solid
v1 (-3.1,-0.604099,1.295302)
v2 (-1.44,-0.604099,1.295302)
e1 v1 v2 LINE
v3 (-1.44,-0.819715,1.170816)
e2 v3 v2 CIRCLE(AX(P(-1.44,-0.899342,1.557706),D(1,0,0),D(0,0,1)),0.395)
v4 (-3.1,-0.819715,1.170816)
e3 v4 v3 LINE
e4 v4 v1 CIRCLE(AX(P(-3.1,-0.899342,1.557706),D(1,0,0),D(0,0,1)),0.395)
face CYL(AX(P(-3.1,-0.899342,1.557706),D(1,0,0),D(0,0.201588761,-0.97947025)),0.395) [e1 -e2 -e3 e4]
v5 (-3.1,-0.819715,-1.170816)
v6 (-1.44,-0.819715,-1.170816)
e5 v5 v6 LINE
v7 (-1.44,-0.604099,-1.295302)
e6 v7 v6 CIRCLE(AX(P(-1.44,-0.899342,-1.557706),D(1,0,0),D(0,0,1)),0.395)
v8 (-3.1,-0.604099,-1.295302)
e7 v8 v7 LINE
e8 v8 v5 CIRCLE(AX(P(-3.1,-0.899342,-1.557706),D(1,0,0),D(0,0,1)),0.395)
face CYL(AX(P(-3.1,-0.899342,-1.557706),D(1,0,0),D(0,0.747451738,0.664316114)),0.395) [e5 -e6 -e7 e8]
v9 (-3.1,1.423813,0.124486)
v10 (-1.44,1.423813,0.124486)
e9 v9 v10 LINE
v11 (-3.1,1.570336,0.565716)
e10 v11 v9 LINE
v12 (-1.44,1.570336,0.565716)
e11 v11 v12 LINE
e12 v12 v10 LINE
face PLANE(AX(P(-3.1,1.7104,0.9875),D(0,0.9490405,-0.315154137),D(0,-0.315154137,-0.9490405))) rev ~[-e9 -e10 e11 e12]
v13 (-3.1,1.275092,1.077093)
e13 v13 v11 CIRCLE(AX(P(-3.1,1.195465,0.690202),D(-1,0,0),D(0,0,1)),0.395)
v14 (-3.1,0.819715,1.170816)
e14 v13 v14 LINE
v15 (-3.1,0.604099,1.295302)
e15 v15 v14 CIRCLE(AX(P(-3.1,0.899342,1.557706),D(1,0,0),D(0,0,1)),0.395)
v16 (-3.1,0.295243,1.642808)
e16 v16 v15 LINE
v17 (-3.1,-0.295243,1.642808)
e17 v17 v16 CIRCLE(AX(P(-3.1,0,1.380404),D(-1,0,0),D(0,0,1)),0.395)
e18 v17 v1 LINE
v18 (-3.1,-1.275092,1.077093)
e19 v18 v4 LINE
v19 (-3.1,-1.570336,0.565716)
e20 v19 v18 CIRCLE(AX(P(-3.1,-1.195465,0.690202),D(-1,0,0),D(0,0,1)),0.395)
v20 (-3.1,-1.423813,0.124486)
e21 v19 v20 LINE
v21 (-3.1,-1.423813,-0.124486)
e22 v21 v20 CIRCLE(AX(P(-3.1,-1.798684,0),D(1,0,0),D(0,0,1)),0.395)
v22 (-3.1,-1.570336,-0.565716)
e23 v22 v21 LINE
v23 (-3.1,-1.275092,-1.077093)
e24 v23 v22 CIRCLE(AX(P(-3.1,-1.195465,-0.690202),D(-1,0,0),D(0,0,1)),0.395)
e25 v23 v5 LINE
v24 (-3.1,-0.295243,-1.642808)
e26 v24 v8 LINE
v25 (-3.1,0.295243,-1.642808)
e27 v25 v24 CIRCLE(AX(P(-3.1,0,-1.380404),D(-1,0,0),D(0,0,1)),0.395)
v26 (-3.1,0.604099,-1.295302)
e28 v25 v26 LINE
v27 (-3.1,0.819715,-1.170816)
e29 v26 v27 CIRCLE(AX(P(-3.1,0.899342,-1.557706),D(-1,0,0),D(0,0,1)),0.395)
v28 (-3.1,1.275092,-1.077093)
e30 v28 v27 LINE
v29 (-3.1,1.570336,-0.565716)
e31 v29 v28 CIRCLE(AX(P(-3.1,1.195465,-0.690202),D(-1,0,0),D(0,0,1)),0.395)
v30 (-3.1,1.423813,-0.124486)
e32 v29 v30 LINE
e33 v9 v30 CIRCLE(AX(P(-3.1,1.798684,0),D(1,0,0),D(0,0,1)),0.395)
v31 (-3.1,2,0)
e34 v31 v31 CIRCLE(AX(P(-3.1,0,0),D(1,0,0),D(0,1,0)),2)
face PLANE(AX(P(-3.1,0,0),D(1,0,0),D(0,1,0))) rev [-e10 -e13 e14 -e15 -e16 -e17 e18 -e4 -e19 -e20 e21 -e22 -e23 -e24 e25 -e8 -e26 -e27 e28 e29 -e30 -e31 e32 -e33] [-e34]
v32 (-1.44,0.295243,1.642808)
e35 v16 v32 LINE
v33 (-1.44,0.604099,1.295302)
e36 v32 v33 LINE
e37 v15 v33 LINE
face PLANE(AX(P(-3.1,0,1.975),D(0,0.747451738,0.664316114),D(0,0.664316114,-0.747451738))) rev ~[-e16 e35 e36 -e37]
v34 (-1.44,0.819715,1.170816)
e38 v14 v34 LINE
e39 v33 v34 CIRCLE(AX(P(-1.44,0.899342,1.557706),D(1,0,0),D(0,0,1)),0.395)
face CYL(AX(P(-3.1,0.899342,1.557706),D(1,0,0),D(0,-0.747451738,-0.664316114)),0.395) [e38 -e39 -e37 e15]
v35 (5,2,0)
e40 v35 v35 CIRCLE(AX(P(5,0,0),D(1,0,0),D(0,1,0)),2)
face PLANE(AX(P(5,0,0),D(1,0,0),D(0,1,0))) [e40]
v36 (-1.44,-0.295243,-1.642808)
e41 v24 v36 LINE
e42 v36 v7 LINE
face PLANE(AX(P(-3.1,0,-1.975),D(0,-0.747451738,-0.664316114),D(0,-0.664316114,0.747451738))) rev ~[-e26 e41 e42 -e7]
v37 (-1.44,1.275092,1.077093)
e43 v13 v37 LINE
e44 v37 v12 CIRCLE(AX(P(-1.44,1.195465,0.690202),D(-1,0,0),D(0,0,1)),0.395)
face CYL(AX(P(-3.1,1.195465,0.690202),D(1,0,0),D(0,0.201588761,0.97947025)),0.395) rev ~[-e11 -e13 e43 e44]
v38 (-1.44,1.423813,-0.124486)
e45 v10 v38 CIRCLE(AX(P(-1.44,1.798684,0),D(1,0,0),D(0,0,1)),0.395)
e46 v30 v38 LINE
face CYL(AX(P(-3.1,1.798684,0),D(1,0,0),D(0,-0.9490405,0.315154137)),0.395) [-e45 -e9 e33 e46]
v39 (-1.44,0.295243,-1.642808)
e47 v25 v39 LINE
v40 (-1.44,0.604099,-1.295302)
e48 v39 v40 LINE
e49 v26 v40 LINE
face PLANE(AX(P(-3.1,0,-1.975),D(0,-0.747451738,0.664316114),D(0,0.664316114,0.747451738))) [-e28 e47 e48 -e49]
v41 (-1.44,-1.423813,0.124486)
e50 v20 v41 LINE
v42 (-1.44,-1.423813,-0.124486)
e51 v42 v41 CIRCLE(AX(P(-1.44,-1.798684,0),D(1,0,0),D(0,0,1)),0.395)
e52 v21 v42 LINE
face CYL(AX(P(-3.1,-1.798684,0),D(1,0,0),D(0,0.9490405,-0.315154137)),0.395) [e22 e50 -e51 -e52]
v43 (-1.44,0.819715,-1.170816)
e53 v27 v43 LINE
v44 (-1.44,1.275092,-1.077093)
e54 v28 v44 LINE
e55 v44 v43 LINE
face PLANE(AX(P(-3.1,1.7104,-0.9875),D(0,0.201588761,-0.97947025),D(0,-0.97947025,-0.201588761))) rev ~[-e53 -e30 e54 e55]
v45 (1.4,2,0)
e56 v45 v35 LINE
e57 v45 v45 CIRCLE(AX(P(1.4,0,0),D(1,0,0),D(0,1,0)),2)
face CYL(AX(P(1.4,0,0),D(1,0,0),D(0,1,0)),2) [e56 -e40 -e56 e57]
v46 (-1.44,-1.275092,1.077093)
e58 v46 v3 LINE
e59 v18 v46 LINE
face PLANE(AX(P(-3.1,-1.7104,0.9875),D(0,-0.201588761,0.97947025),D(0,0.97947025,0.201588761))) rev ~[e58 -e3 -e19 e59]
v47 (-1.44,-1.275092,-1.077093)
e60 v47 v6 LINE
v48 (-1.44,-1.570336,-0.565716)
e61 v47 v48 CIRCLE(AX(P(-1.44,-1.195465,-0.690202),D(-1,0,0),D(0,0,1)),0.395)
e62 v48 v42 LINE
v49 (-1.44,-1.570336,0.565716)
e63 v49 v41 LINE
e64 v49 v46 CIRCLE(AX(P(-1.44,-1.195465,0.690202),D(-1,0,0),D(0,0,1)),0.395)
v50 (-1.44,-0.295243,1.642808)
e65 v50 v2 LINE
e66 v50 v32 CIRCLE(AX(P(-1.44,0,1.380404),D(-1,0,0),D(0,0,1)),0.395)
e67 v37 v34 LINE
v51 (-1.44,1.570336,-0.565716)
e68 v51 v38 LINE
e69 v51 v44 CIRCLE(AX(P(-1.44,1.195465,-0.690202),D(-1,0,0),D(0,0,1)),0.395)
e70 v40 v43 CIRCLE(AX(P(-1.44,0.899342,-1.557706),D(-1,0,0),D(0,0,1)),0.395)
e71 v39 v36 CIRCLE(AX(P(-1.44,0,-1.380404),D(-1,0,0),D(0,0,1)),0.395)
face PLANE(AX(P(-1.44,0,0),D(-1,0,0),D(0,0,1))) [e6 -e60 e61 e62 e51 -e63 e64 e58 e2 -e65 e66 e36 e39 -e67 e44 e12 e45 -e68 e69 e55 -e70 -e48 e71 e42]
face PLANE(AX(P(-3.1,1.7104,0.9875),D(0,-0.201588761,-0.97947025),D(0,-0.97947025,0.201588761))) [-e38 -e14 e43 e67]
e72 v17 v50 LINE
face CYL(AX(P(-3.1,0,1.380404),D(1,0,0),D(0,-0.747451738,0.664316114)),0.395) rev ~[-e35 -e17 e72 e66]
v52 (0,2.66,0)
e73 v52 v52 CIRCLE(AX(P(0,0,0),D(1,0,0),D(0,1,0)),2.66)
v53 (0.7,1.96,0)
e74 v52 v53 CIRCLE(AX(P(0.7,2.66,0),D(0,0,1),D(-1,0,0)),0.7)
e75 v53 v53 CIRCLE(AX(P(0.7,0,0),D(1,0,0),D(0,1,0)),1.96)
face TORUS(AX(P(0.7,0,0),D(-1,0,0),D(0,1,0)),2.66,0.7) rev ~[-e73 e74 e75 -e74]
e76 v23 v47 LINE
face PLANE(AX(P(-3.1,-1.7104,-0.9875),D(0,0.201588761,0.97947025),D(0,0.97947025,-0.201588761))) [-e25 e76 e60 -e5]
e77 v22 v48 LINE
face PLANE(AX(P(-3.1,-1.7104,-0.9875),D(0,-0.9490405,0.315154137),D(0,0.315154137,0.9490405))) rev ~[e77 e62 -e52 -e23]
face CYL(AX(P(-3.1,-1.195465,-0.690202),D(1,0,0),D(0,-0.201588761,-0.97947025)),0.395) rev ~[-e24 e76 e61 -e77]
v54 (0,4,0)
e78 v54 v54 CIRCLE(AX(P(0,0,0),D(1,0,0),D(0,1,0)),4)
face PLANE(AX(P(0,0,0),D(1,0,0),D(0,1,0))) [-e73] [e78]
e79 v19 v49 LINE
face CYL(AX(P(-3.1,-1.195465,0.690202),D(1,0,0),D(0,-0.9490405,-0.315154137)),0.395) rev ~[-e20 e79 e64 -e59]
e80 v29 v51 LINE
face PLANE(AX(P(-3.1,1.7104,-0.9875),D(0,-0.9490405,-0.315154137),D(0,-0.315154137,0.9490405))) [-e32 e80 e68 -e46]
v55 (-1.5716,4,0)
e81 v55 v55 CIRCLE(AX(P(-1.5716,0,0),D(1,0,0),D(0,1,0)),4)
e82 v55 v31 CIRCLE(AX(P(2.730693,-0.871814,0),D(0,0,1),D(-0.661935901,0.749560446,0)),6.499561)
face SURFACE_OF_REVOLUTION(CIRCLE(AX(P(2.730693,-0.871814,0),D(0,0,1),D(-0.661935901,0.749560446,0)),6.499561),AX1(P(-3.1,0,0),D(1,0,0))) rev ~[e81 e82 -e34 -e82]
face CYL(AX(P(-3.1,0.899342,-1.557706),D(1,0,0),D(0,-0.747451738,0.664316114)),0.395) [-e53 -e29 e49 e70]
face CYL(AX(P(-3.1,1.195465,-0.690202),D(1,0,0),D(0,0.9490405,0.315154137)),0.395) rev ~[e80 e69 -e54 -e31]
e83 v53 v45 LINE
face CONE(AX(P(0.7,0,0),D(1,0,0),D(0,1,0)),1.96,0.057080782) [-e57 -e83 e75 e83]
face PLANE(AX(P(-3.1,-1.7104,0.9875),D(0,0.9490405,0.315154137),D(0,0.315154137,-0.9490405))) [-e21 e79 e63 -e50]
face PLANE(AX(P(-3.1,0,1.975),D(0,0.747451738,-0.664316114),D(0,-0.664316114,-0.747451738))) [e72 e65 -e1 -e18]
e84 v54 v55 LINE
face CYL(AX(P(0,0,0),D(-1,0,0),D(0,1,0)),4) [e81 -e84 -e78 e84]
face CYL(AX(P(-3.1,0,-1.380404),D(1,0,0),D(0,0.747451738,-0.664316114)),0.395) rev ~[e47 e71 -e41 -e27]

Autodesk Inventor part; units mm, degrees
ref_plane "YZ Plane" through (0, 0, 0) normal (1, 0, 0) x (0, 1, 0)
ref_plane "XZ Plane" through (0, 0, 0) normal (0, 1, 0) x (-1, 0, 0)
ref_plane "XY Plane" through (0, 0, 0) normal (0, 0, 1) x (1, 0, 0)
sketch "Sketch4" plane through (0, 0, 0) normal (0, 0, 1) x (1, 0, 0)
  line L0 (-3.1, 0) -> (5, 0)
  line L1 (0, 0) -> (-3.1, 0)
  line L2 (0, 4) -> (0, 2.66)
  line L3 (0.7, 1.96) -> (0.7, 1.96)
  line L4 (0.7, 1.96) -> (1.4, 2)
  arc A0 (0, 2.66) -> (0.7, 1.96) centre (0.7, 2.66) ccw
  line L5 (-3.1, 0) -> (-3.1, 2)
  line L6 (0, 4) -> (-1.5716, 4)
  arc A1 (-1.5716, 4) -> (-3.1, 2) centre (2.731, -0.8721) ccw
  line L7 (1.4, 2) -> (5, 2)
  line L8 (5, 2) -> (5, 0)
  point P0 (0, 1.96)
  dimension "d71" = 0.7
  dimension "d72" = 5
  dimension "d74" = 0.7
  dimension "d75" = 3.92
  dimension "d78" = 4
  dimension "d82" = 6.5
  dimension "d83" = 3.1
  dimension "d84" = 8
  dimension "d104" = 3.6
  dimension "d105" = 4
revolve "Revolution7" add sketch "Sketch4" angle 360 about axis through (-3.1, 0, 0) along (1, 0, 0)
sketch "Sketch5" plane through (-3.1, 0, 0) normal (-1, 0, 0) x (0, 0, 1)
  circle A0 centre (0, 0) radius 1.975 construction
  circle A1 centre (0, 0) radius 1.3825 construction
  line L0 (0, 0) -> (-1.1973, 0.6912)
  line L1 (0, 0) -> (-1.1973, -0.6912)
  line L2 (-1.8008, 0) -> (1.7887, 0)
  line L3 (-1.975, 0) -> (-1.1973, -0.6912)
  line L4 (-1.975, 0) -> (-1.1973, 0.6912)
  point P0 (0, 0)
  dimension "d88" = 3.95
  dimension "d89" = 2.765
  dimension "d90" = 30
  dimension "d91" = 30
extrude "Extrusion1" cut sketch "Sketch5" against normal blind 1.66
pattern_circular "Circular Pattern1" count 6 over 360 about axis through (-10, 0, 0) along (1, 0, 0) of "Extrusion1"
fillet "Fillet1" radius 0.395 12 edges at (-2.27, -1.7104, -0.9875) (-2.27, -0.6912, -1.1973) (-2.27, -1.3825, 0) (-2.27, -1.7104, 0.9875) (-2.27, -0.6912, 1.1973) (-2.27, 0, 1.975) (-2.27, 1.3825, 0) (-2.27, 1.7104, 0.9875) (-2.27, 0.6913, 1.1973) (-2.27, 0.6912, -1.1973) (-2.27, 0, -1.975) (-2.27, 1.7104, -0.9875)
thread "Thread7" size "M4x0.7" class "6g" standard "ISO Metric profile" length 3.6
equation "\"a\" = 1.4"
equation "\"b\" = 3.6"
equation "\"dk\" = 8"
equation "\"k\" = 3.1"
equation "\"r\" = 0.7"
equation "\"rf\" = 6.5"
equation "\"x\" = 0.7"
equation "\"A_\" = 3.95"
equation "\"t\" = 1.66"
equation "\"p\" = 0.7"
equation "\"l_\" = 5"
equation "\"d\" = 4"
equation "\"ds_\" = 3.92"
equation "\"lg\" = 0"
properties part number "Flachkopfschraube mit Innenrund ISO 14583 - M4 x 5 - A3-70" material "Edelstahl"
